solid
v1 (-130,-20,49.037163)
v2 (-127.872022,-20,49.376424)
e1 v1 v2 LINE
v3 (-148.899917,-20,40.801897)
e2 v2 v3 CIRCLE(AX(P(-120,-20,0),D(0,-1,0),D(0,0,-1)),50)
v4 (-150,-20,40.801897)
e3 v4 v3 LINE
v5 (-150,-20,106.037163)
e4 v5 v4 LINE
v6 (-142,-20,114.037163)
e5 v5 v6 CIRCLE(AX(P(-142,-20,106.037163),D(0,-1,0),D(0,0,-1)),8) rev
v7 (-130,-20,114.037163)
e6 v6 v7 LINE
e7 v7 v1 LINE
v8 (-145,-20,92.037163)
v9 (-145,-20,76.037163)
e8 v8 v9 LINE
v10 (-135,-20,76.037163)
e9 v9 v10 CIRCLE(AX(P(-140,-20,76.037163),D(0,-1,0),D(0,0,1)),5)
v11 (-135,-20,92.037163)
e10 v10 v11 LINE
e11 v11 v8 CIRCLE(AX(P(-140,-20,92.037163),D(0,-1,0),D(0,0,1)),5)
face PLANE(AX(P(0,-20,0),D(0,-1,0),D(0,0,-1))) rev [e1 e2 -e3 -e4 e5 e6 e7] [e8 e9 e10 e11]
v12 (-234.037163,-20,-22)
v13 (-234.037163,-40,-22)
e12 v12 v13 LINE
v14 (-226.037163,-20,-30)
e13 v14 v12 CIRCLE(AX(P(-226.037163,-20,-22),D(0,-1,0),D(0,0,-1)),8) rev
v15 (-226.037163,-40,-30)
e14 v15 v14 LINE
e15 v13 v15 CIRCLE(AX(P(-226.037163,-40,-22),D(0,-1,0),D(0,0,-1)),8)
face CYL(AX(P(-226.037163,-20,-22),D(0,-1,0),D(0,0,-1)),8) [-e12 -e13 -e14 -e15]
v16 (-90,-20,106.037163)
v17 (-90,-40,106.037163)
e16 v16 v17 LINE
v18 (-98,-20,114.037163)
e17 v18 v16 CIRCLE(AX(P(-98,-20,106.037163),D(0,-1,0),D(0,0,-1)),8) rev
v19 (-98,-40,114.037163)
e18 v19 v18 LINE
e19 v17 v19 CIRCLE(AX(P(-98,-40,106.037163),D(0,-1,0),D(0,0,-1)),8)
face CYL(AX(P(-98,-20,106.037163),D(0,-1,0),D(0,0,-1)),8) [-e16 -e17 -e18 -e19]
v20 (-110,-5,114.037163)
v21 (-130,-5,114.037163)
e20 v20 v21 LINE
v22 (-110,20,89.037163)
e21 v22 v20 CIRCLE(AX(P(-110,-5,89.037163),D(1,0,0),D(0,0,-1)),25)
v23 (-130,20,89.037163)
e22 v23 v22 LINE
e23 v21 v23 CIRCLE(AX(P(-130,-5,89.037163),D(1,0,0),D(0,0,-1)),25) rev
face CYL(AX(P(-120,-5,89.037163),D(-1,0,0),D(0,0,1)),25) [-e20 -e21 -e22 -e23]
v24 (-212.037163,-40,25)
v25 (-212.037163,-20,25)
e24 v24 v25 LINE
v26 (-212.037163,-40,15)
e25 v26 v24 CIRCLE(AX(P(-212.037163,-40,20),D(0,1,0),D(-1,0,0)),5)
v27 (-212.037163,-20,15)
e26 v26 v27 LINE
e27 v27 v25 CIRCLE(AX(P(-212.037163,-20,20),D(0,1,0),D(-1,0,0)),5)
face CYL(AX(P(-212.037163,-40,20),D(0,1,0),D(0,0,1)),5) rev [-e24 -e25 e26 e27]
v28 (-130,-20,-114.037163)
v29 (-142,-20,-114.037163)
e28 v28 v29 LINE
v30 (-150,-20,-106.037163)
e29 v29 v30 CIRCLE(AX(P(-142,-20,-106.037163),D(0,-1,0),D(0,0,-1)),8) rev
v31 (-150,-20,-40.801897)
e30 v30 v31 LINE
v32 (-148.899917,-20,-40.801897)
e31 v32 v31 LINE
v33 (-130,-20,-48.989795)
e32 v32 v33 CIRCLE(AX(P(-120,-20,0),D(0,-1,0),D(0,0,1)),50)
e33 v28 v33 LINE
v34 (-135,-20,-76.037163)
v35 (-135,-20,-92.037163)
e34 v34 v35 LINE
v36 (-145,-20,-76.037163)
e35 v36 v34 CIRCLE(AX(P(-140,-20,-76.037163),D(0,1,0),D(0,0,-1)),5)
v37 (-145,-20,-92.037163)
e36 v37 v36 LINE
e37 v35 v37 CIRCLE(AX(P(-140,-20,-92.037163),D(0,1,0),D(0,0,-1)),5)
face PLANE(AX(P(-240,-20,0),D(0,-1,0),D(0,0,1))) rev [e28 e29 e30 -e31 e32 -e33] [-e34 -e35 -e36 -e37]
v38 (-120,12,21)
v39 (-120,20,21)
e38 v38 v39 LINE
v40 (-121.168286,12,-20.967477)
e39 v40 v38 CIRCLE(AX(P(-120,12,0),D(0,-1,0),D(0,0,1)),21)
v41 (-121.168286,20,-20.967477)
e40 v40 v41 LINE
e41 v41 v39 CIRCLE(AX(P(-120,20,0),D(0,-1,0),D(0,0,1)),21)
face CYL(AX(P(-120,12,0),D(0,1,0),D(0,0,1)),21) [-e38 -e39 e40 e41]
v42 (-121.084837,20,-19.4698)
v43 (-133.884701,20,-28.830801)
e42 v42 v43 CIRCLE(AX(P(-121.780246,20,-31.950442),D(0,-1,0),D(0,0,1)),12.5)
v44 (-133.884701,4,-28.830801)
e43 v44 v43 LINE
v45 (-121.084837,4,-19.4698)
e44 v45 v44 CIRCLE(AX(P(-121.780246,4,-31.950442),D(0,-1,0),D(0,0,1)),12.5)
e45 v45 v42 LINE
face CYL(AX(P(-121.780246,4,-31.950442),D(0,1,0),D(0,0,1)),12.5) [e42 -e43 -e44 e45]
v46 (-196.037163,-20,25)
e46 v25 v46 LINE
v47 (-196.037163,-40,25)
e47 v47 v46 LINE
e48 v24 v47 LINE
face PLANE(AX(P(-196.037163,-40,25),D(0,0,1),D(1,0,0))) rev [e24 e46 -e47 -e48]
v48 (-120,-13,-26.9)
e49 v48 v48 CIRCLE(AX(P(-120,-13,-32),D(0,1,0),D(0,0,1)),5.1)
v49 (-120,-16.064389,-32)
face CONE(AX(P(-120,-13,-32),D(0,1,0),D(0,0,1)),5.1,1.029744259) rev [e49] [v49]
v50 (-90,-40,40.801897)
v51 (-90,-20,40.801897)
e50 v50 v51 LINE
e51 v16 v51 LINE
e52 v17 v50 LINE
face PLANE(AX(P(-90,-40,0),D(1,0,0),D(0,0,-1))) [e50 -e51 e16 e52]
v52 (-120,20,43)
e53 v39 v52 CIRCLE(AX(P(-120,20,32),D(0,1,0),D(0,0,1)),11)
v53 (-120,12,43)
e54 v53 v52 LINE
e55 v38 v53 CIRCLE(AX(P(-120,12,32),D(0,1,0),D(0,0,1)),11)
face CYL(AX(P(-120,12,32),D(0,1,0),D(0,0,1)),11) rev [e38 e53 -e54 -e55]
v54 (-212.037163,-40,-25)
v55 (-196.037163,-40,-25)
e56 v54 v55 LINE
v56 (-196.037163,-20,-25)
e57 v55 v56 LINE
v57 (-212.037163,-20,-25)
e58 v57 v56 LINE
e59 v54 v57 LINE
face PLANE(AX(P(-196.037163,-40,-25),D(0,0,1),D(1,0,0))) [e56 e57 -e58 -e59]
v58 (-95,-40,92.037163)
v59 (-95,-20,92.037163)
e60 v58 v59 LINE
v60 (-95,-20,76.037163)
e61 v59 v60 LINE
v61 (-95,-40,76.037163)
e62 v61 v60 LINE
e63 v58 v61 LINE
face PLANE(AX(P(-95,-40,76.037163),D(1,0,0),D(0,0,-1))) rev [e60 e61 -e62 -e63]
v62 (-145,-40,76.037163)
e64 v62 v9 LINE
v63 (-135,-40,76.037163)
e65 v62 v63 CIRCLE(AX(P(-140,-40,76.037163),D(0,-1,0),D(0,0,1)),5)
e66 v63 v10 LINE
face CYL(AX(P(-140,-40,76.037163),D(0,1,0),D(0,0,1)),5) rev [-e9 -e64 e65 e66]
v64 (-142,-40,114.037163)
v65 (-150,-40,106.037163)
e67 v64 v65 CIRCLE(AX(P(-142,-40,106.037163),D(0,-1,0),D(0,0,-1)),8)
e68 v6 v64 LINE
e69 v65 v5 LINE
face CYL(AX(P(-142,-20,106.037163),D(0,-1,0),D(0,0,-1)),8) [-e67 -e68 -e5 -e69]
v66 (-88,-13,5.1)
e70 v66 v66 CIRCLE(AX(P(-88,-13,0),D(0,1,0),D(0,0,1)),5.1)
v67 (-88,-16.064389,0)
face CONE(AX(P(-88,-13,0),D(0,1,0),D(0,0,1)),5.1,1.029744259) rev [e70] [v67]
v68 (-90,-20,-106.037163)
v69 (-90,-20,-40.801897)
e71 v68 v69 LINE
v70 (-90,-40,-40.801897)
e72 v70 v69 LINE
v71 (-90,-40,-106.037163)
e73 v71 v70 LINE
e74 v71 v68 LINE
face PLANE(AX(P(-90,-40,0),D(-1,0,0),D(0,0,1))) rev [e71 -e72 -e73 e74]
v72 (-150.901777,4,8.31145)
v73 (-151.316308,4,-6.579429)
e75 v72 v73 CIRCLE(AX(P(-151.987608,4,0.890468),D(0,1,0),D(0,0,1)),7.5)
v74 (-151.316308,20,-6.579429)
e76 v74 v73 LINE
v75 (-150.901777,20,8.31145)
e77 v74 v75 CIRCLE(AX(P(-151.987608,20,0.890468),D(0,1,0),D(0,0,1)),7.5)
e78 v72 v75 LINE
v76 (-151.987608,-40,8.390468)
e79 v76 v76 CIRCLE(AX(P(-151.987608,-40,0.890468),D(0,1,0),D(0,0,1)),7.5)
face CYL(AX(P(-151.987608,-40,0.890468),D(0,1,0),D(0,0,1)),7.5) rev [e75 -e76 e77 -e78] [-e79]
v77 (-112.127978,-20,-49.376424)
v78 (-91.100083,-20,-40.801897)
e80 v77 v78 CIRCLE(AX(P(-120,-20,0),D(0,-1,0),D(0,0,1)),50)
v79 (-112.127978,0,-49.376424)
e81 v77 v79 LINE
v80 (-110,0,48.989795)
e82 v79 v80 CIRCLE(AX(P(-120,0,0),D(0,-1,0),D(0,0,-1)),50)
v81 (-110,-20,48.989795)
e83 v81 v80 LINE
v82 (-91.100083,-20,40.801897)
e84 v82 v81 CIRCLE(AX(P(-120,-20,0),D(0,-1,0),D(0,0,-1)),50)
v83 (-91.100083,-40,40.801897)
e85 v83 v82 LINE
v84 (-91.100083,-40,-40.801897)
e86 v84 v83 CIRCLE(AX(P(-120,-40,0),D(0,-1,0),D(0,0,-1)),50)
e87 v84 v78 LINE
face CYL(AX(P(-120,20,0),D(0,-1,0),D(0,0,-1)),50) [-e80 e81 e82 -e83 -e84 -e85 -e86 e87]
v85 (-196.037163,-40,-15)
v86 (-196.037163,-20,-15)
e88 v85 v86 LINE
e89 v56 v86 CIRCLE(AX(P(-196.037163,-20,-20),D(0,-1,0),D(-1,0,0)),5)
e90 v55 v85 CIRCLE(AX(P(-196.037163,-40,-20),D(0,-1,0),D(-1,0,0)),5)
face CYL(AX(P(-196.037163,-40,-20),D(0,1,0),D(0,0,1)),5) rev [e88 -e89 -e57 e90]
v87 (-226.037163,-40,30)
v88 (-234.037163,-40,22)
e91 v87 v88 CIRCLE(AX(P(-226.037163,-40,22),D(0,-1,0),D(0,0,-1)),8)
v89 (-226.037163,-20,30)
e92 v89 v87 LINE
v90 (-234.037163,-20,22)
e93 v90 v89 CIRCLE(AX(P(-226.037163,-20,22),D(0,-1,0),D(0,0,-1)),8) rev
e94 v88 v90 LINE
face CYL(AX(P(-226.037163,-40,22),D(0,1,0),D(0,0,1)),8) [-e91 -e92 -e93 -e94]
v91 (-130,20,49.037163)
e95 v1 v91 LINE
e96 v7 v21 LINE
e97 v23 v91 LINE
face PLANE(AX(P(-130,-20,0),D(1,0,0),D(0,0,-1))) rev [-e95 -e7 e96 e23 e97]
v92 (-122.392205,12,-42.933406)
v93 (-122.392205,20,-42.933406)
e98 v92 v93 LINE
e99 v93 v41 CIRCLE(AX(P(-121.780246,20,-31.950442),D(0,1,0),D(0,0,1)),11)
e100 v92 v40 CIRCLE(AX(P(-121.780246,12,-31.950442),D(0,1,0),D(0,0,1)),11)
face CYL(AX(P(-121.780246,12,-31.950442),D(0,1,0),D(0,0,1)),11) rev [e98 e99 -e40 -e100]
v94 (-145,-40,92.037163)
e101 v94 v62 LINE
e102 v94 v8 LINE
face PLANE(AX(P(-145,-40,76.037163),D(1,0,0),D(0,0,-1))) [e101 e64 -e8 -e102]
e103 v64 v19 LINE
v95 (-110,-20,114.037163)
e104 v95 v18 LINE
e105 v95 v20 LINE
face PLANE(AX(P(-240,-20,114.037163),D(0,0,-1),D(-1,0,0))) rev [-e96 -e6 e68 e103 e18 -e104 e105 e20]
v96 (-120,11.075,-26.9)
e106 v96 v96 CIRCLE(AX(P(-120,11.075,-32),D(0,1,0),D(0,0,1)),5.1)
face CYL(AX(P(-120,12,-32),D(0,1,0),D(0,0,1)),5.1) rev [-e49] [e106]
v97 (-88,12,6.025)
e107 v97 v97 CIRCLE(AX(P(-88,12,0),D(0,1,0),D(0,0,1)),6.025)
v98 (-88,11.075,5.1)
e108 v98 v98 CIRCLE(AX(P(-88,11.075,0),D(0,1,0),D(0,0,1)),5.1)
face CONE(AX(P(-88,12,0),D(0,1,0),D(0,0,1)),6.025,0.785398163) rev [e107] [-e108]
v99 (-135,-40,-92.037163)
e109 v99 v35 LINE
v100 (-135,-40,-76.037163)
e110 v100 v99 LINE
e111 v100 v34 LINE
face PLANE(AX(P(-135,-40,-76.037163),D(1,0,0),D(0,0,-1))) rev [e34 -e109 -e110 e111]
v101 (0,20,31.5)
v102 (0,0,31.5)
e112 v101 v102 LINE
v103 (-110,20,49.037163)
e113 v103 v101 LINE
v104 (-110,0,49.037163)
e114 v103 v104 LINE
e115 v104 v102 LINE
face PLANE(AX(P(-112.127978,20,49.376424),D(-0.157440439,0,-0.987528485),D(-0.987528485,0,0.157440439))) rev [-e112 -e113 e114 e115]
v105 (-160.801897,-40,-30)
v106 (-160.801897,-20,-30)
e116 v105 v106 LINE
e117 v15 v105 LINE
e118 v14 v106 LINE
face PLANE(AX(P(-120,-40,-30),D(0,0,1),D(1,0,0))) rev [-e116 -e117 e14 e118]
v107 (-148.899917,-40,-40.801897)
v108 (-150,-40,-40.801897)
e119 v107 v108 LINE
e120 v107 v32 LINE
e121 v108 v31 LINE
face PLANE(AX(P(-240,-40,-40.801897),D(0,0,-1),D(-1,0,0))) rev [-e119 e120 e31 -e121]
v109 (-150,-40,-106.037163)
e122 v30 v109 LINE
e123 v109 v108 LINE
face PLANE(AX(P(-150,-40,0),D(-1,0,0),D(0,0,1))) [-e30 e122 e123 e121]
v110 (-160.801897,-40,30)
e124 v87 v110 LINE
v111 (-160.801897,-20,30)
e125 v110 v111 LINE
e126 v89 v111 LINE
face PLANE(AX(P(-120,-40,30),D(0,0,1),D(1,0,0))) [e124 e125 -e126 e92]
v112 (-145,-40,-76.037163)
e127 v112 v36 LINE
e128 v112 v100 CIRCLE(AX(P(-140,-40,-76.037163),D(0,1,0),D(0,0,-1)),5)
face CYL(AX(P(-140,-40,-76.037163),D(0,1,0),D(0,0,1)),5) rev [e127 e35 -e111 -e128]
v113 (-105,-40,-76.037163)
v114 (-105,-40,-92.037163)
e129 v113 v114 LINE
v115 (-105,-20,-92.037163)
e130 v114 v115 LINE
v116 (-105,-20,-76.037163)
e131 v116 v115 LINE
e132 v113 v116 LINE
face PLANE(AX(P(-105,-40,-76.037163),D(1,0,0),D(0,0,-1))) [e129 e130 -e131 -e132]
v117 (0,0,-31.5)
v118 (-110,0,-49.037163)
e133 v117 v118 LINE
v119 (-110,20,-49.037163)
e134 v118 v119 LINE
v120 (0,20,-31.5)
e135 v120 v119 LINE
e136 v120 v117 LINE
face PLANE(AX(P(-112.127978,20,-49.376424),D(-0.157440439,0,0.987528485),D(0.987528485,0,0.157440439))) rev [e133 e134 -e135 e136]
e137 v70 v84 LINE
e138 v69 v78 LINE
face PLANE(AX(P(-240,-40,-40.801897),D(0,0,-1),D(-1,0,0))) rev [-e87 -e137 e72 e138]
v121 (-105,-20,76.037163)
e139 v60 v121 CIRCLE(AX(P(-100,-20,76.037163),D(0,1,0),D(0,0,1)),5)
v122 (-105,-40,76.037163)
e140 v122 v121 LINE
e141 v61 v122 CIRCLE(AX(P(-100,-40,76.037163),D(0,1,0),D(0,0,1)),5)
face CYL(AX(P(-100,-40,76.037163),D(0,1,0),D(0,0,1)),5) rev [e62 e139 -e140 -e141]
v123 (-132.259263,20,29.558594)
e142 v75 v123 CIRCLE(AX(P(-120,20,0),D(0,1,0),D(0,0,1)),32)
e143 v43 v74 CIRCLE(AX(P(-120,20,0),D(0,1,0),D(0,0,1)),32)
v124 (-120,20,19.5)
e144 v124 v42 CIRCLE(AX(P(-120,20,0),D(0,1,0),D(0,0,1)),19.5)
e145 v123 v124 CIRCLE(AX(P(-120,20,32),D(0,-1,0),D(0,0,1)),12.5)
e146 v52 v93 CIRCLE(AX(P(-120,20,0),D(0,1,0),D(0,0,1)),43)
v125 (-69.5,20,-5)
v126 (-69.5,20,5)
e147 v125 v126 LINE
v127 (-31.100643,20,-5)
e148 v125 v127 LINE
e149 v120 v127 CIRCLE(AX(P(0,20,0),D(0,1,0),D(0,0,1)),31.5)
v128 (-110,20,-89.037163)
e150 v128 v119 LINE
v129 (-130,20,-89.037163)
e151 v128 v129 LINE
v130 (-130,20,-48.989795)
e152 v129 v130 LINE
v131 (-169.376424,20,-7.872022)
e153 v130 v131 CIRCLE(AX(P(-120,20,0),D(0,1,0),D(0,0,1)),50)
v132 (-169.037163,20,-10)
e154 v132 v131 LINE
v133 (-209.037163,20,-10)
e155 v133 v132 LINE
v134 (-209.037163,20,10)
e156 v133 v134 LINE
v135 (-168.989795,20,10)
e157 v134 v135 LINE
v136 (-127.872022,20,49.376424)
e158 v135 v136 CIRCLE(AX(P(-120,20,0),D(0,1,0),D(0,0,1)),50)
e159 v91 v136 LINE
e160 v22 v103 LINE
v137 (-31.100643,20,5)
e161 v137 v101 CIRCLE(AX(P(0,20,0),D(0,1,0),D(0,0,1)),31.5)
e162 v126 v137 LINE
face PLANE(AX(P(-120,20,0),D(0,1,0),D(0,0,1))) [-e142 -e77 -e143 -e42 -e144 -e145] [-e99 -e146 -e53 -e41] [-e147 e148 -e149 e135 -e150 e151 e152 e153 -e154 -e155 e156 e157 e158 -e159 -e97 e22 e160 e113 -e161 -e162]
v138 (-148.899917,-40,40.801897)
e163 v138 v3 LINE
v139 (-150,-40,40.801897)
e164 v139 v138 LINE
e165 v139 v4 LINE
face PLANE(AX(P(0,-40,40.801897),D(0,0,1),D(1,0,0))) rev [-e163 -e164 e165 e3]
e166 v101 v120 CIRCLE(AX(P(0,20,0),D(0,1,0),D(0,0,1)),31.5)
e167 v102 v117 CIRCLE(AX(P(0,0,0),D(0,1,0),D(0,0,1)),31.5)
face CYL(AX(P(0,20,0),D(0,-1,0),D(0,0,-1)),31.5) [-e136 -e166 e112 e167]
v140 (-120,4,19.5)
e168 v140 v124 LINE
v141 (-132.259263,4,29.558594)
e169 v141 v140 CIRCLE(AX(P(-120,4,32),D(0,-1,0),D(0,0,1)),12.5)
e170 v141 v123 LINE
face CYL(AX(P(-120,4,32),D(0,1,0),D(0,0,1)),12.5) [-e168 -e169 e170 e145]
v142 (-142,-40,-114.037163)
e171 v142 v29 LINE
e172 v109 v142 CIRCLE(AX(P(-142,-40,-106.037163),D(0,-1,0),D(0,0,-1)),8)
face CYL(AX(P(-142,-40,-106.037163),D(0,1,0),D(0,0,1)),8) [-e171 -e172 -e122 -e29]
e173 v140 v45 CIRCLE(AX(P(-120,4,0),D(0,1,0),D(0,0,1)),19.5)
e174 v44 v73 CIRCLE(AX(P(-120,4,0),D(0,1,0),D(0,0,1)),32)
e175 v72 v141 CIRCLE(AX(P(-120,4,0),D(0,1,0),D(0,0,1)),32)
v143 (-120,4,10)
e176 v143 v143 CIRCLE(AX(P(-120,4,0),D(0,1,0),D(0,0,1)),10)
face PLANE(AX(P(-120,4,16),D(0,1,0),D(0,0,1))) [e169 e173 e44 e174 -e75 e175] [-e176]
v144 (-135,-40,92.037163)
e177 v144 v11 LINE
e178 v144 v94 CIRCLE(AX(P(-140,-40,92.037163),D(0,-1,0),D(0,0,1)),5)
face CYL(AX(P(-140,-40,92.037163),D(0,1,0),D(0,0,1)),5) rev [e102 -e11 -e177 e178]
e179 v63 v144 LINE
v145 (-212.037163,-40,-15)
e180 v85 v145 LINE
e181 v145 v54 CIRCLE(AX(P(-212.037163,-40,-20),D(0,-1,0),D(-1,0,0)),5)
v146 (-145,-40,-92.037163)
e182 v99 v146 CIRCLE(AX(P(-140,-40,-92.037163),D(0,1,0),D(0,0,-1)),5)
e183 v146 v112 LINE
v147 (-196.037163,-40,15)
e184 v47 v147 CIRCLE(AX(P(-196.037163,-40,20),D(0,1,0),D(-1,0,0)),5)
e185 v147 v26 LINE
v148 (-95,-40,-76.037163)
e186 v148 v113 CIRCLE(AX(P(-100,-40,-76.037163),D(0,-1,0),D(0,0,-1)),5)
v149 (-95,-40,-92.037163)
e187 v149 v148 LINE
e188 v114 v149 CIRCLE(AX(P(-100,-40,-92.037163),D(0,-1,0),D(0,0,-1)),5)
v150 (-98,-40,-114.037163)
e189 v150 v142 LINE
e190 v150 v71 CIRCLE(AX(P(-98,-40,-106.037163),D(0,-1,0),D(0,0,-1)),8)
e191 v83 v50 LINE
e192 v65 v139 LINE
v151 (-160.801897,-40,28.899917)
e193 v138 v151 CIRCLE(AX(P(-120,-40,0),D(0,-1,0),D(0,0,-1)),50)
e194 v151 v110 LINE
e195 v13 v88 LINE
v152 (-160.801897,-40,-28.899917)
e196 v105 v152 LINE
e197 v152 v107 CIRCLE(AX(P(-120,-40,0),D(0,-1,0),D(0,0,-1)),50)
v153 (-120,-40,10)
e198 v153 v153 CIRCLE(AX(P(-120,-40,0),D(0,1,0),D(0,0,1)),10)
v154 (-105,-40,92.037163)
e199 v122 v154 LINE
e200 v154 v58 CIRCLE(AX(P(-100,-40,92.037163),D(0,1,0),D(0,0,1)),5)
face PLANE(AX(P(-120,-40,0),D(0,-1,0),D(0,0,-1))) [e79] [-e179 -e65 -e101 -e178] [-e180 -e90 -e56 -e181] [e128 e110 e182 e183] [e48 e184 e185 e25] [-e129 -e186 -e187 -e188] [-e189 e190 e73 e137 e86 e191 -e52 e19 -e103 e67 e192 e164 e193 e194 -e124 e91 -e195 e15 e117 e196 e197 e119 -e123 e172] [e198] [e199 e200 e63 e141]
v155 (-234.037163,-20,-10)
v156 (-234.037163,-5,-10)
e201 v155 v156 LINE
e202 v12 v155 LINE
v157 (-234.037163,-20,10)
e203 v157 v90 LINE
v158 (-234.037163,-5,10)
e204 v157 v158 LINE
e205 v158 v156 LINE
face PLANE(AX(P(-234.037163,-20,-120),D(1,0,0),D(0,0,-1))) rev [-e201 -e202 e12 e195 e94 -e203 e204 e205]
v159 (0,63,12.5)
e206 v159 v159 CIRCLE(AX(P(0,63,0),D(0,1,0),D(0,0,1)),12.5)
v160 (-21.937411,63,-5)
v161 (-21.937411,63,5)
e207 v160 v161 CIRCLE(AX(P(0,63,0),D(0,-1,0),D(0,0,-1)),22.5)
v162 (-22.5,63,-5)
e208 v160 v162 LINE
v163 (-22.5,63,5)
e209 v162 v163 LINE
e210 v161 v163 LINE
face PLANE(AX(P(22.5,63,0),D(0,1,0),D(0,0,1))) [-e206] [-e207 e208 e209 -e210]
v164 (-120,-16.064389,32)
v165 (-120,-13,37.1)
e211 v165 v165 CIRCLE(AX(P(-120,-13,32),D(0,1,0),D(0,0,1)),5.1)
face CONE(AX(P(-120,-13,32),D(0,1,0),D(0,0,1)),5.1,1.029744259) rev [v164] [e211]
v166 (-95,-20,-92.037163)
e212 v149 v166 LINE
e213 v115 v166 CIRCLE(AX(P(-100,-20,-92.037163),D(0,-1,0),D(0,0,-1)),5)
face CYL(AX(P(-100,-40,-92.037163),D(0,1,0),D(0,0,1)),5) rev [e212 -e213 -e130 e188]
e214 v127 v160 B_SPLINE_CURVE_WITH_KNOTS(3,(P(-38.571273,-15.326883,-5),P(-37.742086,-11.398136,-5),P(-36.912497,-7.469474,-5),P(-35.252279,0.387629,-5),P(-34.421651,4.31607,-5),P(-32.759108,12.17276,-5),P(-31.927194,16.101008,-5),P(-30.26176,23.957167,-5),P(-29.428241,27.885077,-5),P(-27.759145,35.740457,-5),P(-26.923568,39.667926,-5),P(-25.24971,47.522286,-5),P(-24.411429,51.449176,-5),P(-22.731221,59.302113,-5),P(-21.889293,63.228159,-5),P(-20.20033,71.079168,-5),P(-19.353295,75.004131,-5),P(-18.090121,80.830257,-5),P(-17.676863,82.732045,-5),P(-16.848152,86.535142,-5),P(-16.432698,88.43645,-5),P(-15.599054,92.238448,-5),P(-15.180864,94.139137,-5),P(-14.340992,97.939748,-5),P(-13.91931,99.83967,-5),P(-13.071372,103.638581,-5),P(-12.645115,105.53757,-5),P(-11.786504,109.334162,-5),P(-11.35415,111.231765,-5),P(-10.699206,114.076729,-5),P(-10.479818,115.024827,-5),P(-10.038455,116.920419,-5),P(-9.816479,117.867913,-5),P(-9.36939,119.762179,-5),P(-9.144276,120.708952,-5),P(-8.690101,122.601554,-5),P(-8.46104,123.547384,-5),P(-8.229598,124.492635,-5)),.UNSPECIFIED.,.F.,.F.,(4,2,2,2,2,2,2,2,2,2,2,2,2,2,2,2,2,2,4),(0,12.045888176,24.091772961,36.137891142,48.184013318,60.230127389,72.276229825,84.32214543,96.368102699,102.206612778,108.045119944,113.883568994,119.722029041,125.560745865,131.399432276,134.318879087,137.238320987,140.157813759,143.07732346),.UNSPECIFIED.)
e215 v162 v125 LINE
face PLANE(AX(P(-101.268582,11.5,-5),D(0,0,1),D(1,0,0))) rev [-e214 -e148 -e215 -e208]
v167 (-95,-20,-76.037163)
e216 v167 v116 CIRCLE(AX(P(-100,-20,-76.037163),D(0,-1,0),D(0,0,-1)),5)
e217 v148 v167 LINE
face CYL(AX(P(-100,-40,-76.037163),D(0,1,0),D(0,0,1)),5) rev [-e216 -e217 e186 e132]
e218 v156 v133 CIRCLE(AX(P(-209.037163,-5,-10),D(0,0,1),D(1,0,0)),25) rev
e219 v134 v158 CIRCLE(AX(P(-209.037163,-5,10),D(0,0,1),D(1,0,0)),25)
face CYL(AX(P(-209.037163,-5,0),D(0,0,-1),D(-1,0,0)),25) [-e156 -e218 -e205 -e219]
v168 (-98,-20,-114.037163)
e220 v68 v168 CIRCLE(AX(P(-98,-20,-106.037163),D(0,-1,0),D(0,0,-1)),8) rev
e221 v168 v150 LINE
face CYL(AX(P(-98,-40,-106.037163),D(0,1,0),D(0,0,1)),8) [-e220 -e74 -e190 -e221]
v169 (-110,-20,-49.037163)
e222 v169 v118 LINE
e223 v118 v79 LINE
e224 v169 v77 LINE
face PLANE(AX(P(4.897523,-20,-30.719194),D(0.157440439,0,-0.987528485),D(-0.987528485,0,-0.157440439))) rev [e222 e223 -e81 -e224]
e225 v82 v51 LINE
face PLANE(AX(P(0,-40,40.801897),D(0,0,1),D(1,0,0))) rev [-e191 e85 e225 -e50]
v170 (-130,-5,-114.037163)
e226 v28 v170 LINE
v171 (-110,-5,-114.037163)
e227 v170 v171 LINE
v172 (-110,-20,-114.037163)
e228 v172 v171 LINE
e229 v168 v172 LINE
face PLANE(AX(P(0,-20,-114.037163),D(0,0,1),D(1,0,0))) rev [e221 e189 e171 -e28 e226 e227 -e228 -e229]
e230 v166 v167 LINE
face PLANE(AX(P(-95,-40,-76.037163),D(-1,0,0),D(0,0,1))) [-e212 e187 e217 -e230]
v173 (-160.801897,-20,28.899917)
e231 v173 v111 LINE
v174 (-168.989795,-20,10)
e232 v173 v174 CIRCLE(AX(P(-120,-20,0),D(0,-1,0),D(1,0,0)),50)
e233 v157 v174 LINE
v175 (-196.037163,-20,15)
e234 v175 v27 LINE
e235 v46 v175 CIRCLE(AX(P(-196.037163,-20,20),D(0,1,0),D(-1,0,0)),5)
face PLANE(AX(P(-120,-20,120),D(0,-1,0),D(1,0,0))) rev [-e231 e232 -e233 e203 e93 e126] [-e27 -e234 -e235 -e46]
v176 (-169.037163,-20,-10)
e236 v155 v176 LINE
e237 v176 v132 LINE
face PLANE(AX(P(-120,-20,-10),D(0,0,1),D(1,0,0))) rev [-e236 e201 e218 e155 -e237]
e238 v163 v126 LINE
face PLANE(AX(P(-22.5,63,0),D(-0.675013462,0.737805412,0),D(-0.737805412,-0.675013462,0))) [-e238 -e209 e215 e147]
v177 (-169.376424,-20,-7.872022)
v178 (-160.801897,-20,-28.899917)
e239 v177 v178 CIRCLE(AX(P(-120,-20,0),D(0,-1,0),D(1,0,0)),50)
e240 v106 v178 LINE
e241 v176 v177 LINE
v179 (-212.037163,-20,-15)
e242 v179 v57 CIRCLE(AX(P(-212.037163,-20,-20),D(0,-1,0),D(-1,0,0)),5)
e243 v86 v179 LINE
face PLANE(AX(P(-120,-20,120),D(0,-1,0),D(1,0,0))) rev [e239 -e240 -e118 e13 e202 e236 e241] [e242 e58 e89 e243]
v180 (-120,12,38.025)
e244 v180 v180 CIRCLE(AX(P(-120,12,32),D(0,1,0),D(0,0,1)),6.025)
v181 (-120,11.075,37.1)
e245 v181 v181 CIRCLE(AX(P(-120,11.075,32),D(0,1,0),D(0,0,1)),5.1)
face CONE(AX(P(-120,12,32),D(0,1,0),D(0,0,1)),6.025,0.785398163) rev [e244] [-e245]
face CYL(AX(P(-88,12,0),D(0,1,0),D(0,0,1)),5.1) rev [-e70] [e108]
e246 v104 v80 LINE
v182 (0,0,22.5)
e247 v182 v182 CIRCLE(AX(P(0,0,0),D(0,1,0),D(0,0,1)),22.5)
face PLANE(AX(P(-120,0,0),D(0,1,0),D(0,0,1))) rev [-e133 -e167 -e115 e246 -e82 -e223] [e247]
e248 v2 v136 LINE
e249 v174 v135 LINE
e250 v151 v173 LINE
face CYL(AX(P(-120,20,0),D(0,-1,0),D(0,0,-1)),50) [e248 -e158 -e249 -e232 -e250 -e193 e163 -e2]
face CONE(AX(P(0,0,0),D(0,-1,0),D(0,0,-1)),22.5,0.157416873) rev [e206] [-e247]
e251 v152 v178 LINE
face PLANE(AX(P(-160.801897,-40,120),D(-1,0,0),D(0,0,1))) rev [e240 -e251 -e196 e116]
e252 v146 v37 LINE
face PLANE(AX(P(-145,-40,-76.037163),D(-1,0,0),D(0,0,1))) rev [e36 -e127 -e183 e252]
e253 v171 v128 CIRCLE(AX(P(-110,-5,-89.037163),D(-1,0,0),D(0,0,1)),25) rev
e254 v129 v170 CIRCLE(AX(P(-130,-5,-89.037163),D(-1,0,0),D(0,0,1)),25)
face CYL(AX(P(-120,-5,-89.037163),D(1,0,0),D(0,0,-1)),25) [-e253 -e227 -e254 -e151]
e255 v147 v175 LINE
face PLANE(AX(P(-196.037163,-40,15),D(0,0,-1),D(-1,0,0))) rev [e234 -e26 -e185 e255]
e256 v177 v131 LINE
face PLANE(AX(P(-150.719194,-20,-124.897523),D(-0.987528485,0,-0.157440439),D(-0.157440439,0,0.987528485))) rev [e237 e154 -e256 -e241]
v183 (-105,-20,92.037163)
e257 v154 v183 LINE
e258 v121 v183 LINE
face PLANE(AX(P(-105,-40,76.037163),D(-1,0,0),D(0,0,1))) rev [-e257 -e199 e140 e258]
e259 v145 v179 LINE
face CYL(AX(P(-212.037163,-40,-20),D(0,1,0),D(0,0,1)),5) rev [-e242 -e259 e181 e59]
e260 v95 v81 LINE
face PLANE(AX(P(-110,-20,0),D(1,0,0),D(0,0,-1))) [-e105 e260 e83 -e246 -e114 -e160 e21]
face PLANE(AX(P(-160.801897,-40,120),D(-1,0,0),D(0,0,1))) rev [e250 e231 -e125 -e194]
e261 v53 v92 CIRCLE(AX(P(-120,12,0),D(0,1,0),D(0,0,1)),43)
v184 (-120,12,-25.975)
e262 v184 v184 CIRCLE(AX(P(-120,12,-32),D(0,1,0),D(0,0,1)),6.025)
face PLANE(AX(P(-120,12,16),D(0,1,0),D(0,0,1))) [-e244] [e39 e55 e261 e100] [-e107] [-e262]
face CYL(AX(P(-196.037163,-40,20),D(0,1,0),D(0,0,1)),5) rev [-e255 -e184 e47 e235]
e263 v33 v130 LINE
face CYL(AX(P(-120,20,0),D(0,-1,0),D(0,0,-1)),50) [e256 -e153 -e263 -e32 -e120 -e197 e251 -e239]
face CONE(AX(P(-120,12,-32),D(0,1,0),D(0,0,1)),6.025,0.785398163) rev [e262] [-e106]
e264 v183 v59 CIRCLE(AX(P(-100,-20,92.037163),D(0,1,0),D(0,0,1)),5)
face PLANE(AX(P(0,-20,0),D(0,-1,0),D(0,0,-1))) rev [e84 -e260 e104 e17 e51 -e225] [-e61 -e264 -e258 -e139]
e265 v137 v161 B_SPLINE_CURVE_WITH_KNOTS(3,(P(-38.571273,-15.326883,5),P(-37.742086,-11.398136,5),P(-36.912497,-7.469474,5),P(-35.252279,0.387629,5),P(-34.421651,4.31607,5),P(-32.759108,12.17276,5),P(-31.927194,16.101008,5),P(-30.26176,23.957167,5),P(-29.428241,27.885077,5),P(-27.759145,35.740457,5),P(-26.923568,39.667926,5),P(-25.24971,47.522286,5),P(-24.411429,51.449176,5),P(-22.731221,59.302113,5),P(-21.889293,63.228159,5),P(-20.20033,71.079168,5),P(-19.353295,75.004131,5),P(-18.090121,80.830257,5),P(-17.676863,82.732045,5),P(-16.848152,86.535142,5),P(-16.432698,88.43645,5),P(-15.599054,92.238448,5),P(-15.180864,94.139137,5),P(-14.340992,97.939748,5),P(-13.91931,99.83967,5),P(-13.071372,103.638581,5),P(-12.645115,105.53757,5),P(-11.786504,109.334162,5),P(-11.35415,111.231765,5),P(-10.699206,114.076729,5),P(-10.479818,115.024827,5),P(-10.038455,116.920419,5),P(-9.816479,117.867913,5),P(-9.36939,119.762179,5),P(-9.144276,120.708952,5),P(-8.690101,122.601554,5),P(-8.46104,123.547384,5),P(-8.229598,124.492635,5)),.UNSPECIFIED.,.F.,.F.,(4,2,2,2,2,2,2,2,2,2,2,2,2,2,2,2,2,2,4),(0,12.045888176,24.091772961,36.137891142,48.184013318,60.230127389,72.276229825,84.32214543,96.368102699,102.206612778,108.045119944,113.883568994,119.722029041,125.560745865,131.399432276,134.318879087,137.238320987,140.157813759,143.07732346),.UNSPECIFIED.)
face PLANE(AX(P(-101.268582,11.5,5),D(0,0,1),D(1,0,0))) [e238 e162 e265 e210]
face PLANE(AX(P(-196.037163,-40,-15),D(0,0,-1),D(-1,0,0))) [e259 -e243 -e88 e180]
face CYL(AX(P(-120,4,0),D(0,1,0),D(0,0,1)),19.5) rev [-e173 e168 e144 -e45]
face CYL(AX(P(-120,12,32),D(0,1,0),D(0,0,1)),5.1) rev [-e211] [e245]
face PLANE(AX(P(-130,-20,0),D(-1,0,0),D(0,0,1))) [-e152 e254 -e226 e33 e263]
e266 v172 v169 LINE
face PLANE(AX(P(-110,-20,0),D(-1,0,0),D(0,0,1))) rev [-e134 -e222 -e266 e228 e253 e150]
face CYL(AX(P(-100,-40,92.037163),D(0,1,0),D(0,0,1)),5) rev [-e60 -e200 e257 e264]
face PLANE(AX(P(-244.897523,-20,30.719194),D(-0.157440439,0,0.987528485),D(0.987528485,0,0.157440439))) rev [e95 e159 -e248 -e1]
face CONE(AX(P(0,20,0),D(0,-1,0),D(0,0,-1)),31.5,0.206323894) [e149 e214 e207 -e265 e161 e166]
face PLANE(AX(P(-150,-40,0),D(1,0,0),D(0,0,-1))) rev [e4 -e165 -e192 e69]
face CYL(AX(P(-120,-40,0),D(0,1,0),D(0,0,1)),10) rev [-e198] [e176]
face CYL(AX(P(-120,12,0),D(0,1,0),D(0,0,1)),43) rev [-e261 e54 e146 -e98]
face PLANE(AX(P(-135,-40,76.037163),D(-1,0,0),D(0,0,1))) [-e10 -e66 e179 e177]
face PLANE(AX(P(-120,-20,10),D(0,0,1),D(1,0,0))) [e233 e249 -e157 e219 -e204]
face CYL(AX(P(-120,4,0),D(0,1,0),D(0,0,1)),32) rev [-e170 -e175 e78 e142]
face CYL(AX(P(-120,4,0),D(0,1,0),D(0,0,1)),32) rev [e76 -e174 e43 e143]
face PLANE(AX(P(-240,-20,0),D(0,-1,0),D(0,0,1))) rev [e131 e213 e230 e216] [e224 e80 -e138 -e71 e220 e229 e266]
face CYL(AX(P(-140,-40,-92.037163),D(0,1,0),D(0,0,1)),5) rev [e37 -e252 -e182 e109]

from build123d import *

# Parameters (mm, degrees)
BOSS_EXTRUDE1_DEPTH      = 20
BOSS_EXTRUDE2_START      = 40
SKETCH3_R                = 50
BOSS_EXTRUDE2_DEPTH      = 40
BOSS_EXTRUDE3_START      = -40
BOSS_EXTRUDE3_DEPTH      = 40
FILLET1_R                = 25
CIRPATTERN1_COUNT        = 2
CIRPATTERN1_ANGLE        = 90
FILLET1_OF_CIRPATTERN1_R = 25
CIRPATTERN2_COUNT        = 2
FILLET1_OF_CIRPATTERN2_R = 25
BOSS_EXTRUDE4_START      = 20
BOSS_EXTRUDE4_DEPTH      = 20
FILLET2_R                = 8
FILLET3_R                = 8
CUT_EXTRUDE1_DEPTH       = 264.396788984
CIRPATTERN4_COUNT        = 2
CIRPATTERN4_ANGLE        = 180
CIRPATTERN4_COPY_1_DEPTH = 264.396788984
FILLET4_R                = 8
FILLET5_R                = 8
CIRPATTERN6_COUNT        = 2
CIRPATTERN6_ANGLE        = 270
CIRPATTERN6_COPY_1_DEPTH = 264.396788984
FILLET6_R                = 8
FILLET7_R                = 8
CUT_EXTRUDE2_DEPTH       = 8
CIRPATTERN7_COUNT        = 3
CIRPATTERN7_ANGLE        = 180
CUT_EXTRUDE3_DEPTH       = 16
SKETCH21_R               = 7.5
CUT_EXTRUDE4_DEPTH       = 268.16636848
SKETCH22_R               = 10
CUT_EXTRUDE5_DEPTH       = 267.943567929


with BuildPart() as part:
    # Sketch2 → Boss-Extrude1 (new body)
    with BuildSketch(Plane(origin=(0, 0, 0), x_dir=(1, 0, 0), z_dir=(0, 1, 0))):
        with BuildLine():
            Line((-112.127978028, 49.376424233), (0, 31.5))
            ThreePointArc((0, 31.5), (31.5, 0), (0, -31.5))
            Line((0, -31.5), (-112.127978028, -49.376424233))
            ThreePointArc((-112.127978028, -49.376424233), (-170, 0), (-112.127978028, 49.376424233))
        make_face()
    extrude(amount=BOSS_EXTRUDE1_DEPTH)

    # Sketch3 → Boss-Extrude2 (add)
    with BuildSketch(Plane.XZ.offset(BOSS_EXTRUDE2_START)):
        with Locations(Location((-120, 0, 0), (0, 0, 270))):
            Circle(SKETCH3_R)
    extrude(amount=-BOSS_EXTRUDE2_DEPTH)

    # Sketch5 → Boss-Extrude3 (add)
    with BuildSketch(Plane(origin=(0, 20, 0), x_dir=(1, 0, 0), z_dir=(0, 1, 0)).offset(BOSS_EXTRUDE3_START)):
        with BuildLine():
            Line((-130, 114.03716334), (-130, 48.989794856))
            ThreePointArc((-130, 48.989794856), (-121.081407967, 49.9883042), (-112.127978028, 49.376424233))
            Line((-112.127978028, 49.376424233), (-110, 49.03716334))
            Line((-110, 49.03716334), (-110, 114.03716334))
            Line((-110, 114.03716334), (-130, 114.03716334))
        make_face()
    boss_extrude3 = extrude(amount=BOSS_EXTRUDE3_DEPTH)

    # Fillet1
    fillet1_edges = [part.edges().sort_by_distance(p)[0] for p in [
        (-120, 20, -114.03716334),
    ]]
    fillet(fillet1_edges, radius=FILLET1_R)

    # CirPattern1: Boss-Extrude3 ×2 about axis
    cirpattern1_axis = Axis((-120, 0, 0), (0, 1, 0))
    for i in range(1, CIRPATTERN1_COUNT):
        add(boss_extrude3.rotate(cirpattern1_axis, i * CIRPATTERN1_ANGLE / (CIRPATTERN1_COUNT - 1)))

    # Fillet1 of CirPattern1
    fillet1_of_cirpattern1_edges = [part.edges().sort_by_distance(p)[0] for p in [
        (-234.03716334, 20, 0),
    ]]
    fillet(fillet1_of_cirpattern1_edges, radius=FILLET1_OF_CIRPATTERN1_R)

    # CirPattern2: Boss-Extrude3 ×2 about axis
    cirpattern2_axis = Axis((-120, 0, 0), (0, 1, 0))
    for i in range(1, CIRPATTERN2_COUNT):
        add(boss_extrude3.rotate(cirpattern2_axis, i * 360 / CIRPATTERN2_COUNT))

    # Fillet1 of CirPattern2
    fillet1_of_cirpattern2_edges = [part.edges().sort_by_distance(p)[0] for p in [
        (-120, 20, 114.03716334),
    ]]
    fillet(fillet1_of_cirpattern2_edges, radius=FILLET1_OF_CIRPATTERN2_R)

    # Sketch6 → Boss-Extrude4 (add)
    with BuildSketch(Plane.XZ.offset(20).offset(BOSS_EXTRUDE4_START)):
        with BuildLine():
            ThreePointArc((-110, 48.989794856), (-100.123850776, 45.879610853), (-91.100082802, 40.801896842))
            Line((-91.100082802, 40.801896842), (-90, 40.801896842))
            Line((-90, 40.801896842), (-90, 114.03716334))
            Line((-90, 114.03716334), (-110, 114.03716334))
            Line((-110, 114.03716334), (-110, 48.989794856))
        make_face()
        with BuildLine():
            ThreePointArc((-120, 50), (-114.9745519, 49.74680765), (-110, 48.989794856))
            Line((-110, 48.989794856), (-110, 114.03716334))
            Line((-110, 114.03716334), (-120, 114.03716334))
            Line((-120, 114.03716334), (-120, 50))
        make_face()
        with BuildLine():
            Line((-130, 49.03716334), (-127.872021972, 49.376424233))
            ThreePointArc((-127.872021972, 49.376424233), (-123.948340685, 49.843862268), (-120, 50))
            Line((-120, 50), (-120, 114.03716334))
            Line((-120, 114.03716334), (-130, 114.03716334))
            Line((-130, 114.03716334), (-130, 49.03716334))
        make_face()
        with BuildLine():
            Line((-150, 40.801896842), (-148.899917198, 40.801896842))
            ThreePointArc((-148.899917198, 40.801896842), (-138.879208341, 46.298763401), (-127.872021972, 49.376424233))
            Line((-127.872021972, 49.376424233), (-130, 49.03716334))
            Line((-130, 49.03716334), (-130, 114.03716334))
            Line((-130, 114.03716334), (-150, 114.03716334))
            Line((-150, 114.03716334), (-150, 40.801896842))
        make_face()
    boss_extrude4 = extrude(amount=-BOSS_EXTRUDE4_DEPTH)

    # Fillet2
    fillet2_edges = [part.edges().sort_by_distance(p)[0] for p in [
        (-150, -30, 114.03716334),
    ]]
    fillet(fillet2_edges, radius=FILLET2_R)

    # Fillet3
    fillet3_edges = [part.edges().sort_by_distance(p)[0] for p in [
        (-90, -30, 114.03716334),
    ]]
    fillet(fillet3_edges, radius=FILLET3_R)

    # Sketch8 → Cut-Extrude1 (cut, through all)
    with BuildSketch(Plane(origin=(0, -20, 0), x_dir=(1, 0, 0), z_dir=(0, 1, 0))):
        with BuildLine():
            Line((-95, -76.03716334), (-95, -92.03716334))
            ThreePointArc((-95, -92.03716334), (-100, -97.03716334), (-105, -92.03716334))
            Line((-105, -92.03716334), (-105, -76.03716334))
            ThreePointArc((-105, -76.03716334), (-100, -71.03716334), (-95, -76.03716334))
        make_face()
    cut_extrude1 = extrude(amount=-CUT_EXTRUDE1_DEPTH, mode=Mode.SUBTRACT)

    # Mirror1: Cut-Extrude1 across plane
    add(cut_extrude1.mirror(Plane(origin=(-120, 0, 0), x_dir=(0, 0, 1), z_dir=(1, 0, 0))), mode=Mode.SUBTRACT)

    # CirPattern4: Boss-Extrude4, Cut-Extrude1 ×2 about axis
    cirpattern4_axis = Axis((-120, 0, 0), (0, 1, 0))
    add([boss_extrude4.rotate(cirpattern4_axis, i * CIRPATTERN4_ANGLE / (CIRPATTERN4_COUNT - 1)) for i in range(1, CIRPATTERN4_COUNT)])
    add([cut_extrude1.rotate(cirpattern4_axis, i * CIRPATTERN4_ANGLE / (CIRPATTERN4_COUNT - 1)) for i in range(1, CIRPATTERN4_COUNT)], mode=Mode.SUBTRACT)

    # CirPattern4 copy 1 sketch → CirPattern4 copy 1 (cut, through all)
    with BuildSketch(Plane(origin=(0, -20, 0), x_dir=(1, 0, 0), z_dir=(0, 1, 0))):
        with BuildLine():
            Line((-95, 76.03716334), (-95, 92.03716334))
            ThreePointArc((-95, 92.03716334), (-100, 97.03716334), (-105, 92.03716334))
            Line((-105, 92.03716334), (-105, 76.03716334))
            ThreePointArc((-105, 76.03716334), (-100, 71.03716334), (-95, 76.03716334))
        make_face()
    extrude(amount=-CIRPATTERN4_COPY_1_DEPTH, mode=Mode.SUBTRACT)

    # Fillet4
    fillet4_edges = [part.edges().sort_by_distance(p)[0] for p in [
        (-90, -30, -114.03716334),
    ]]
    fillet(fillet4_edges, radius=FILLET4_R)

    # Fillet5
    fillet5_edges = [part.edges().sort_by_distance(p)[0] for p in [
        (-150, -30, -114.03716334),
    ]]
    fillet(fillet5_edges, radius=FILLET5_R)

    # CirPattern6: Boss-Extrude4, Cut-Extrude1 ×2 about axis
    cirpattern6_axis = Axis((-120, 0, 0), (0, 1, 0))
    add([boss_extrude4.rotate(cirpattern6_axis, i * CIRPATTERN6_ANGLE / (CIRPATTERN6_COUNT - 1)) for i in range(1, CIRPATTERN6_COUNT)])
    add([cut_extrude1.rotate(cirpattern6_axis, i * CIRPATTERN6_ANGLE / (CIRPATTERN6_COUNT - 1)) for i in range(1, CIRPATTERN6_COUNT)], mode=Mode.SUBTRACT)

    # CirPattern6 copy 1 sketch → CirPattern6 copy 1 (cut, through all)
    with BuildSketch(Plane(origin=(-120, -20, -120), x_dir=(0, 0, -1), z_dir=(0, 1, 0))):
        with BuildLine():
            Line((-95, 76.03716334), (-95, 92.03716334))
            ThreePointArc((-95, 92.03716334), (-100, 97.03716334), (-105, 92.03716334))
            Line((-105, 92.03716334), (-105, 76.03716334))
            ThreePointArc((-105, 76.03716334), (-100, 71.03716334), (-95, 76.03716334))
        make_face()
    extrude(amount=-CIRPATTERN6_COPY_1_DEPTH, mode=Mode.SUBTRACT)

    # Fillet6
    fillet6_edges = [part.edges().sort_by_distance(p)[0] for p in [
        (-234.03716334, -30, 30),
    ]]
    fillet(fillet6_edges, radius=FILLET6_R)

    # Fillet7
    fillet7_edges = [part.edges().sort_by_distance(p)[0] for p in [
        (-234.03716334, -30, -30),
    ]]
    fillet(fillet7_edges, radius=FILLET7_R)

    # Sketch10 → Revolve1 (revolve)
    with BuildSketch(Plane.XY, mode=Mode.PRIVATE) as revolve1_sk:
        Polygon((31.5, 20), (22.5, 63), (0, 63), (0, 20), align=None)
    revolve(revolve1_sk.sketch.rotate(Axis((0, 0, 0), (0, 1, 0)), 90), axis=Axis((0, 0, 0), (0, 1, 0)))

    # Sketch11 → Cut-Revolve1 (revolve, cut)
    with BuildSketch(Plane.XY, mode=Mode.PRIVATE) as cut_revolve1_sk:
        Polygon((0, 63), (0, 0), (22.5, 0), (12.5, 63), align=None)
    revolve(cut_revolve1_sk.sketch.rotate(Axis((0, 82.375246711, 0), (0, -1, 0)), 90), axis=Axis((0, 82.375246711, 0), (0, -1, 0)), mode=Mode.SUBTRACT)

    # Rib6: read off the stored shape, not the designer's step
    # Rib6: loft between two sections, ruled curve by curve
    rib6_from = [
        Edge.make_line((-69.5, 20, 5), (-31.10064308, 20, 5)),
        Edge.make_line((-31.10064308, 20, -5), (-69.5, 20, -5)),
        Edge.make_line((-69.5, 20, -5), (-69.5, 20, 5)),
        Edge.make_line((-31.10064308, 20, -5), (-31.10064308, 20, 5)),
    ]
    rib6_to = [
        Edge.make_line((-22.5, 63, 5), (-21.937410968, 63, 5)),
        Edge.make_line((-21.937410968, 63, -5), (-22.5, 63, -5)),
        Edge.make_line((-22.5, 63, -5), (-22.5, 63, 5)),
        Edge.make_line((-21.937410968, 63, -5), (-21.937410968, 63, 5)),
    ]
    rib6 = Solid(Shell([*[Face.make_surface_from_curves(rib6_from[k], rib6_to[k]) for k in range(4)], Face(Wire(rib6_from)), Face(Wire(rib6_to))]))
    add(rib6)

    # Sketch15 → Cut-Extrude2 (cut)
    with BuildSketch(Plane(origin=(0, 20, 0), x_dir=(1, 0, 0), z_dir=(0, 1, 0))):
        with BuildLine():
            ThreePointArc((-120, -43), (-77.016651718, 1.196566115), (-122.392205492, 42.933406025))
            ThreePointArc((-122.392205492, 42.933406025), (-132.763210279, 31.338482148), (-121.168286403, 20.967477361))
            ThreePointArc((-121.168286403, 20.967477361), (-99.008132234, 0.584369498), (-120, -21))
            ThreePointArc((-120, -21), (-131, -32), (-120, -43))
        make_face()
    extrude(amount=-CUT_EXTRUDE2_DEPTH, mode=Mode.SUBTRACT)

    # Sketch19 → M12 Tapped Hole1 (revolve, cut)
    with BuildSketch(Plane(origin=(-120, 12, 32), x_dir=(0, 0, 1), z_dir=(1, 0, 0))):
        Polygon((0, 0), (0, 28.064389157), (5.1, 25), (5.1, 0.925), (6.025, 0), align=None)
    m12_tapped_hole1 = revolve(axis=Axis((-120, 18.35, 32), (0, -1, 0)), mode=Mode.SUBTRACT)

    # CirPattern7: M12 Tapped Hole1 ×3 about axis
    cirpattern7_axis = Axis((-120, 0, 0), (0, 1, 0))
    for i in range(1, CIRPATTERN7_COUNT):
        add(m12_tapped_hole1.rotate(cirpattern7_axis, i * CIRPATTERN7_ANGLE / (CIRPATTERN7_COUNT - 1)), mode=Mode.SUBTRACT)

    # Sketch20 → Cut-Extrude3 (cut)
    with BuildSketch(Plane(origin=(0, 20, 0), x_dir=(1, 0, 0), z_dir=(0, 1, 0))):
        with BuildLine():
            ThreePointArc((-133.884701329, 28.8308007), (-151.987608024, -0.890467807), (-132.259263254, -29.55859375))
            ThreePointArc((-132.259263254, -29.55859375), (-127.928821535, -22.33647119), (-120, -19.5))
            ThreePointArc((-120, -19.5), (-100.50755136, 0.54262882), (-121.084837374, 19.469800407))
            ThreePointArc((-121.084837374, 19.469800407), (-129.159180077, 21.860777124), (-133.884701329, 28.8308007))
        make_face()
    extrude(amount=-CUT_EXTRUDE3_DEPTH, mode=Mode.SUBTRACT)

    # Sketch21 → Cut-Extrude4 (cut, through all)
    with BuildSketch(Plane(origin=(0, 20, 0), x_dir=(1, 0, 0), z_dir=(0, 1, 0))):
        with Locations(Location((-151.987608024, -0.890467807, 0), (0, 0, 270))):
            Circle(SKETCH21_R)
    extrude(amount=-CUT_EXTRUDE4_DEPTH, mode=Mode.SUBTRACT)

    # Sketch22 → Cut-Extrude5 (cut, through all)
    with BuildSketch(Plane(origin=(0, 4, 0), x_dir=(1, 0, 0), z_dir=(0, 1, 0))):
        with Locations(Location((-120, 0, 0), (0, 0, 270))):
            Circle(SKETCH22_R)
    extrude(amount=-CUT_EXTRUDE5_DEPTH, mode=Mode.SUBTRACT)


solid = part.part
